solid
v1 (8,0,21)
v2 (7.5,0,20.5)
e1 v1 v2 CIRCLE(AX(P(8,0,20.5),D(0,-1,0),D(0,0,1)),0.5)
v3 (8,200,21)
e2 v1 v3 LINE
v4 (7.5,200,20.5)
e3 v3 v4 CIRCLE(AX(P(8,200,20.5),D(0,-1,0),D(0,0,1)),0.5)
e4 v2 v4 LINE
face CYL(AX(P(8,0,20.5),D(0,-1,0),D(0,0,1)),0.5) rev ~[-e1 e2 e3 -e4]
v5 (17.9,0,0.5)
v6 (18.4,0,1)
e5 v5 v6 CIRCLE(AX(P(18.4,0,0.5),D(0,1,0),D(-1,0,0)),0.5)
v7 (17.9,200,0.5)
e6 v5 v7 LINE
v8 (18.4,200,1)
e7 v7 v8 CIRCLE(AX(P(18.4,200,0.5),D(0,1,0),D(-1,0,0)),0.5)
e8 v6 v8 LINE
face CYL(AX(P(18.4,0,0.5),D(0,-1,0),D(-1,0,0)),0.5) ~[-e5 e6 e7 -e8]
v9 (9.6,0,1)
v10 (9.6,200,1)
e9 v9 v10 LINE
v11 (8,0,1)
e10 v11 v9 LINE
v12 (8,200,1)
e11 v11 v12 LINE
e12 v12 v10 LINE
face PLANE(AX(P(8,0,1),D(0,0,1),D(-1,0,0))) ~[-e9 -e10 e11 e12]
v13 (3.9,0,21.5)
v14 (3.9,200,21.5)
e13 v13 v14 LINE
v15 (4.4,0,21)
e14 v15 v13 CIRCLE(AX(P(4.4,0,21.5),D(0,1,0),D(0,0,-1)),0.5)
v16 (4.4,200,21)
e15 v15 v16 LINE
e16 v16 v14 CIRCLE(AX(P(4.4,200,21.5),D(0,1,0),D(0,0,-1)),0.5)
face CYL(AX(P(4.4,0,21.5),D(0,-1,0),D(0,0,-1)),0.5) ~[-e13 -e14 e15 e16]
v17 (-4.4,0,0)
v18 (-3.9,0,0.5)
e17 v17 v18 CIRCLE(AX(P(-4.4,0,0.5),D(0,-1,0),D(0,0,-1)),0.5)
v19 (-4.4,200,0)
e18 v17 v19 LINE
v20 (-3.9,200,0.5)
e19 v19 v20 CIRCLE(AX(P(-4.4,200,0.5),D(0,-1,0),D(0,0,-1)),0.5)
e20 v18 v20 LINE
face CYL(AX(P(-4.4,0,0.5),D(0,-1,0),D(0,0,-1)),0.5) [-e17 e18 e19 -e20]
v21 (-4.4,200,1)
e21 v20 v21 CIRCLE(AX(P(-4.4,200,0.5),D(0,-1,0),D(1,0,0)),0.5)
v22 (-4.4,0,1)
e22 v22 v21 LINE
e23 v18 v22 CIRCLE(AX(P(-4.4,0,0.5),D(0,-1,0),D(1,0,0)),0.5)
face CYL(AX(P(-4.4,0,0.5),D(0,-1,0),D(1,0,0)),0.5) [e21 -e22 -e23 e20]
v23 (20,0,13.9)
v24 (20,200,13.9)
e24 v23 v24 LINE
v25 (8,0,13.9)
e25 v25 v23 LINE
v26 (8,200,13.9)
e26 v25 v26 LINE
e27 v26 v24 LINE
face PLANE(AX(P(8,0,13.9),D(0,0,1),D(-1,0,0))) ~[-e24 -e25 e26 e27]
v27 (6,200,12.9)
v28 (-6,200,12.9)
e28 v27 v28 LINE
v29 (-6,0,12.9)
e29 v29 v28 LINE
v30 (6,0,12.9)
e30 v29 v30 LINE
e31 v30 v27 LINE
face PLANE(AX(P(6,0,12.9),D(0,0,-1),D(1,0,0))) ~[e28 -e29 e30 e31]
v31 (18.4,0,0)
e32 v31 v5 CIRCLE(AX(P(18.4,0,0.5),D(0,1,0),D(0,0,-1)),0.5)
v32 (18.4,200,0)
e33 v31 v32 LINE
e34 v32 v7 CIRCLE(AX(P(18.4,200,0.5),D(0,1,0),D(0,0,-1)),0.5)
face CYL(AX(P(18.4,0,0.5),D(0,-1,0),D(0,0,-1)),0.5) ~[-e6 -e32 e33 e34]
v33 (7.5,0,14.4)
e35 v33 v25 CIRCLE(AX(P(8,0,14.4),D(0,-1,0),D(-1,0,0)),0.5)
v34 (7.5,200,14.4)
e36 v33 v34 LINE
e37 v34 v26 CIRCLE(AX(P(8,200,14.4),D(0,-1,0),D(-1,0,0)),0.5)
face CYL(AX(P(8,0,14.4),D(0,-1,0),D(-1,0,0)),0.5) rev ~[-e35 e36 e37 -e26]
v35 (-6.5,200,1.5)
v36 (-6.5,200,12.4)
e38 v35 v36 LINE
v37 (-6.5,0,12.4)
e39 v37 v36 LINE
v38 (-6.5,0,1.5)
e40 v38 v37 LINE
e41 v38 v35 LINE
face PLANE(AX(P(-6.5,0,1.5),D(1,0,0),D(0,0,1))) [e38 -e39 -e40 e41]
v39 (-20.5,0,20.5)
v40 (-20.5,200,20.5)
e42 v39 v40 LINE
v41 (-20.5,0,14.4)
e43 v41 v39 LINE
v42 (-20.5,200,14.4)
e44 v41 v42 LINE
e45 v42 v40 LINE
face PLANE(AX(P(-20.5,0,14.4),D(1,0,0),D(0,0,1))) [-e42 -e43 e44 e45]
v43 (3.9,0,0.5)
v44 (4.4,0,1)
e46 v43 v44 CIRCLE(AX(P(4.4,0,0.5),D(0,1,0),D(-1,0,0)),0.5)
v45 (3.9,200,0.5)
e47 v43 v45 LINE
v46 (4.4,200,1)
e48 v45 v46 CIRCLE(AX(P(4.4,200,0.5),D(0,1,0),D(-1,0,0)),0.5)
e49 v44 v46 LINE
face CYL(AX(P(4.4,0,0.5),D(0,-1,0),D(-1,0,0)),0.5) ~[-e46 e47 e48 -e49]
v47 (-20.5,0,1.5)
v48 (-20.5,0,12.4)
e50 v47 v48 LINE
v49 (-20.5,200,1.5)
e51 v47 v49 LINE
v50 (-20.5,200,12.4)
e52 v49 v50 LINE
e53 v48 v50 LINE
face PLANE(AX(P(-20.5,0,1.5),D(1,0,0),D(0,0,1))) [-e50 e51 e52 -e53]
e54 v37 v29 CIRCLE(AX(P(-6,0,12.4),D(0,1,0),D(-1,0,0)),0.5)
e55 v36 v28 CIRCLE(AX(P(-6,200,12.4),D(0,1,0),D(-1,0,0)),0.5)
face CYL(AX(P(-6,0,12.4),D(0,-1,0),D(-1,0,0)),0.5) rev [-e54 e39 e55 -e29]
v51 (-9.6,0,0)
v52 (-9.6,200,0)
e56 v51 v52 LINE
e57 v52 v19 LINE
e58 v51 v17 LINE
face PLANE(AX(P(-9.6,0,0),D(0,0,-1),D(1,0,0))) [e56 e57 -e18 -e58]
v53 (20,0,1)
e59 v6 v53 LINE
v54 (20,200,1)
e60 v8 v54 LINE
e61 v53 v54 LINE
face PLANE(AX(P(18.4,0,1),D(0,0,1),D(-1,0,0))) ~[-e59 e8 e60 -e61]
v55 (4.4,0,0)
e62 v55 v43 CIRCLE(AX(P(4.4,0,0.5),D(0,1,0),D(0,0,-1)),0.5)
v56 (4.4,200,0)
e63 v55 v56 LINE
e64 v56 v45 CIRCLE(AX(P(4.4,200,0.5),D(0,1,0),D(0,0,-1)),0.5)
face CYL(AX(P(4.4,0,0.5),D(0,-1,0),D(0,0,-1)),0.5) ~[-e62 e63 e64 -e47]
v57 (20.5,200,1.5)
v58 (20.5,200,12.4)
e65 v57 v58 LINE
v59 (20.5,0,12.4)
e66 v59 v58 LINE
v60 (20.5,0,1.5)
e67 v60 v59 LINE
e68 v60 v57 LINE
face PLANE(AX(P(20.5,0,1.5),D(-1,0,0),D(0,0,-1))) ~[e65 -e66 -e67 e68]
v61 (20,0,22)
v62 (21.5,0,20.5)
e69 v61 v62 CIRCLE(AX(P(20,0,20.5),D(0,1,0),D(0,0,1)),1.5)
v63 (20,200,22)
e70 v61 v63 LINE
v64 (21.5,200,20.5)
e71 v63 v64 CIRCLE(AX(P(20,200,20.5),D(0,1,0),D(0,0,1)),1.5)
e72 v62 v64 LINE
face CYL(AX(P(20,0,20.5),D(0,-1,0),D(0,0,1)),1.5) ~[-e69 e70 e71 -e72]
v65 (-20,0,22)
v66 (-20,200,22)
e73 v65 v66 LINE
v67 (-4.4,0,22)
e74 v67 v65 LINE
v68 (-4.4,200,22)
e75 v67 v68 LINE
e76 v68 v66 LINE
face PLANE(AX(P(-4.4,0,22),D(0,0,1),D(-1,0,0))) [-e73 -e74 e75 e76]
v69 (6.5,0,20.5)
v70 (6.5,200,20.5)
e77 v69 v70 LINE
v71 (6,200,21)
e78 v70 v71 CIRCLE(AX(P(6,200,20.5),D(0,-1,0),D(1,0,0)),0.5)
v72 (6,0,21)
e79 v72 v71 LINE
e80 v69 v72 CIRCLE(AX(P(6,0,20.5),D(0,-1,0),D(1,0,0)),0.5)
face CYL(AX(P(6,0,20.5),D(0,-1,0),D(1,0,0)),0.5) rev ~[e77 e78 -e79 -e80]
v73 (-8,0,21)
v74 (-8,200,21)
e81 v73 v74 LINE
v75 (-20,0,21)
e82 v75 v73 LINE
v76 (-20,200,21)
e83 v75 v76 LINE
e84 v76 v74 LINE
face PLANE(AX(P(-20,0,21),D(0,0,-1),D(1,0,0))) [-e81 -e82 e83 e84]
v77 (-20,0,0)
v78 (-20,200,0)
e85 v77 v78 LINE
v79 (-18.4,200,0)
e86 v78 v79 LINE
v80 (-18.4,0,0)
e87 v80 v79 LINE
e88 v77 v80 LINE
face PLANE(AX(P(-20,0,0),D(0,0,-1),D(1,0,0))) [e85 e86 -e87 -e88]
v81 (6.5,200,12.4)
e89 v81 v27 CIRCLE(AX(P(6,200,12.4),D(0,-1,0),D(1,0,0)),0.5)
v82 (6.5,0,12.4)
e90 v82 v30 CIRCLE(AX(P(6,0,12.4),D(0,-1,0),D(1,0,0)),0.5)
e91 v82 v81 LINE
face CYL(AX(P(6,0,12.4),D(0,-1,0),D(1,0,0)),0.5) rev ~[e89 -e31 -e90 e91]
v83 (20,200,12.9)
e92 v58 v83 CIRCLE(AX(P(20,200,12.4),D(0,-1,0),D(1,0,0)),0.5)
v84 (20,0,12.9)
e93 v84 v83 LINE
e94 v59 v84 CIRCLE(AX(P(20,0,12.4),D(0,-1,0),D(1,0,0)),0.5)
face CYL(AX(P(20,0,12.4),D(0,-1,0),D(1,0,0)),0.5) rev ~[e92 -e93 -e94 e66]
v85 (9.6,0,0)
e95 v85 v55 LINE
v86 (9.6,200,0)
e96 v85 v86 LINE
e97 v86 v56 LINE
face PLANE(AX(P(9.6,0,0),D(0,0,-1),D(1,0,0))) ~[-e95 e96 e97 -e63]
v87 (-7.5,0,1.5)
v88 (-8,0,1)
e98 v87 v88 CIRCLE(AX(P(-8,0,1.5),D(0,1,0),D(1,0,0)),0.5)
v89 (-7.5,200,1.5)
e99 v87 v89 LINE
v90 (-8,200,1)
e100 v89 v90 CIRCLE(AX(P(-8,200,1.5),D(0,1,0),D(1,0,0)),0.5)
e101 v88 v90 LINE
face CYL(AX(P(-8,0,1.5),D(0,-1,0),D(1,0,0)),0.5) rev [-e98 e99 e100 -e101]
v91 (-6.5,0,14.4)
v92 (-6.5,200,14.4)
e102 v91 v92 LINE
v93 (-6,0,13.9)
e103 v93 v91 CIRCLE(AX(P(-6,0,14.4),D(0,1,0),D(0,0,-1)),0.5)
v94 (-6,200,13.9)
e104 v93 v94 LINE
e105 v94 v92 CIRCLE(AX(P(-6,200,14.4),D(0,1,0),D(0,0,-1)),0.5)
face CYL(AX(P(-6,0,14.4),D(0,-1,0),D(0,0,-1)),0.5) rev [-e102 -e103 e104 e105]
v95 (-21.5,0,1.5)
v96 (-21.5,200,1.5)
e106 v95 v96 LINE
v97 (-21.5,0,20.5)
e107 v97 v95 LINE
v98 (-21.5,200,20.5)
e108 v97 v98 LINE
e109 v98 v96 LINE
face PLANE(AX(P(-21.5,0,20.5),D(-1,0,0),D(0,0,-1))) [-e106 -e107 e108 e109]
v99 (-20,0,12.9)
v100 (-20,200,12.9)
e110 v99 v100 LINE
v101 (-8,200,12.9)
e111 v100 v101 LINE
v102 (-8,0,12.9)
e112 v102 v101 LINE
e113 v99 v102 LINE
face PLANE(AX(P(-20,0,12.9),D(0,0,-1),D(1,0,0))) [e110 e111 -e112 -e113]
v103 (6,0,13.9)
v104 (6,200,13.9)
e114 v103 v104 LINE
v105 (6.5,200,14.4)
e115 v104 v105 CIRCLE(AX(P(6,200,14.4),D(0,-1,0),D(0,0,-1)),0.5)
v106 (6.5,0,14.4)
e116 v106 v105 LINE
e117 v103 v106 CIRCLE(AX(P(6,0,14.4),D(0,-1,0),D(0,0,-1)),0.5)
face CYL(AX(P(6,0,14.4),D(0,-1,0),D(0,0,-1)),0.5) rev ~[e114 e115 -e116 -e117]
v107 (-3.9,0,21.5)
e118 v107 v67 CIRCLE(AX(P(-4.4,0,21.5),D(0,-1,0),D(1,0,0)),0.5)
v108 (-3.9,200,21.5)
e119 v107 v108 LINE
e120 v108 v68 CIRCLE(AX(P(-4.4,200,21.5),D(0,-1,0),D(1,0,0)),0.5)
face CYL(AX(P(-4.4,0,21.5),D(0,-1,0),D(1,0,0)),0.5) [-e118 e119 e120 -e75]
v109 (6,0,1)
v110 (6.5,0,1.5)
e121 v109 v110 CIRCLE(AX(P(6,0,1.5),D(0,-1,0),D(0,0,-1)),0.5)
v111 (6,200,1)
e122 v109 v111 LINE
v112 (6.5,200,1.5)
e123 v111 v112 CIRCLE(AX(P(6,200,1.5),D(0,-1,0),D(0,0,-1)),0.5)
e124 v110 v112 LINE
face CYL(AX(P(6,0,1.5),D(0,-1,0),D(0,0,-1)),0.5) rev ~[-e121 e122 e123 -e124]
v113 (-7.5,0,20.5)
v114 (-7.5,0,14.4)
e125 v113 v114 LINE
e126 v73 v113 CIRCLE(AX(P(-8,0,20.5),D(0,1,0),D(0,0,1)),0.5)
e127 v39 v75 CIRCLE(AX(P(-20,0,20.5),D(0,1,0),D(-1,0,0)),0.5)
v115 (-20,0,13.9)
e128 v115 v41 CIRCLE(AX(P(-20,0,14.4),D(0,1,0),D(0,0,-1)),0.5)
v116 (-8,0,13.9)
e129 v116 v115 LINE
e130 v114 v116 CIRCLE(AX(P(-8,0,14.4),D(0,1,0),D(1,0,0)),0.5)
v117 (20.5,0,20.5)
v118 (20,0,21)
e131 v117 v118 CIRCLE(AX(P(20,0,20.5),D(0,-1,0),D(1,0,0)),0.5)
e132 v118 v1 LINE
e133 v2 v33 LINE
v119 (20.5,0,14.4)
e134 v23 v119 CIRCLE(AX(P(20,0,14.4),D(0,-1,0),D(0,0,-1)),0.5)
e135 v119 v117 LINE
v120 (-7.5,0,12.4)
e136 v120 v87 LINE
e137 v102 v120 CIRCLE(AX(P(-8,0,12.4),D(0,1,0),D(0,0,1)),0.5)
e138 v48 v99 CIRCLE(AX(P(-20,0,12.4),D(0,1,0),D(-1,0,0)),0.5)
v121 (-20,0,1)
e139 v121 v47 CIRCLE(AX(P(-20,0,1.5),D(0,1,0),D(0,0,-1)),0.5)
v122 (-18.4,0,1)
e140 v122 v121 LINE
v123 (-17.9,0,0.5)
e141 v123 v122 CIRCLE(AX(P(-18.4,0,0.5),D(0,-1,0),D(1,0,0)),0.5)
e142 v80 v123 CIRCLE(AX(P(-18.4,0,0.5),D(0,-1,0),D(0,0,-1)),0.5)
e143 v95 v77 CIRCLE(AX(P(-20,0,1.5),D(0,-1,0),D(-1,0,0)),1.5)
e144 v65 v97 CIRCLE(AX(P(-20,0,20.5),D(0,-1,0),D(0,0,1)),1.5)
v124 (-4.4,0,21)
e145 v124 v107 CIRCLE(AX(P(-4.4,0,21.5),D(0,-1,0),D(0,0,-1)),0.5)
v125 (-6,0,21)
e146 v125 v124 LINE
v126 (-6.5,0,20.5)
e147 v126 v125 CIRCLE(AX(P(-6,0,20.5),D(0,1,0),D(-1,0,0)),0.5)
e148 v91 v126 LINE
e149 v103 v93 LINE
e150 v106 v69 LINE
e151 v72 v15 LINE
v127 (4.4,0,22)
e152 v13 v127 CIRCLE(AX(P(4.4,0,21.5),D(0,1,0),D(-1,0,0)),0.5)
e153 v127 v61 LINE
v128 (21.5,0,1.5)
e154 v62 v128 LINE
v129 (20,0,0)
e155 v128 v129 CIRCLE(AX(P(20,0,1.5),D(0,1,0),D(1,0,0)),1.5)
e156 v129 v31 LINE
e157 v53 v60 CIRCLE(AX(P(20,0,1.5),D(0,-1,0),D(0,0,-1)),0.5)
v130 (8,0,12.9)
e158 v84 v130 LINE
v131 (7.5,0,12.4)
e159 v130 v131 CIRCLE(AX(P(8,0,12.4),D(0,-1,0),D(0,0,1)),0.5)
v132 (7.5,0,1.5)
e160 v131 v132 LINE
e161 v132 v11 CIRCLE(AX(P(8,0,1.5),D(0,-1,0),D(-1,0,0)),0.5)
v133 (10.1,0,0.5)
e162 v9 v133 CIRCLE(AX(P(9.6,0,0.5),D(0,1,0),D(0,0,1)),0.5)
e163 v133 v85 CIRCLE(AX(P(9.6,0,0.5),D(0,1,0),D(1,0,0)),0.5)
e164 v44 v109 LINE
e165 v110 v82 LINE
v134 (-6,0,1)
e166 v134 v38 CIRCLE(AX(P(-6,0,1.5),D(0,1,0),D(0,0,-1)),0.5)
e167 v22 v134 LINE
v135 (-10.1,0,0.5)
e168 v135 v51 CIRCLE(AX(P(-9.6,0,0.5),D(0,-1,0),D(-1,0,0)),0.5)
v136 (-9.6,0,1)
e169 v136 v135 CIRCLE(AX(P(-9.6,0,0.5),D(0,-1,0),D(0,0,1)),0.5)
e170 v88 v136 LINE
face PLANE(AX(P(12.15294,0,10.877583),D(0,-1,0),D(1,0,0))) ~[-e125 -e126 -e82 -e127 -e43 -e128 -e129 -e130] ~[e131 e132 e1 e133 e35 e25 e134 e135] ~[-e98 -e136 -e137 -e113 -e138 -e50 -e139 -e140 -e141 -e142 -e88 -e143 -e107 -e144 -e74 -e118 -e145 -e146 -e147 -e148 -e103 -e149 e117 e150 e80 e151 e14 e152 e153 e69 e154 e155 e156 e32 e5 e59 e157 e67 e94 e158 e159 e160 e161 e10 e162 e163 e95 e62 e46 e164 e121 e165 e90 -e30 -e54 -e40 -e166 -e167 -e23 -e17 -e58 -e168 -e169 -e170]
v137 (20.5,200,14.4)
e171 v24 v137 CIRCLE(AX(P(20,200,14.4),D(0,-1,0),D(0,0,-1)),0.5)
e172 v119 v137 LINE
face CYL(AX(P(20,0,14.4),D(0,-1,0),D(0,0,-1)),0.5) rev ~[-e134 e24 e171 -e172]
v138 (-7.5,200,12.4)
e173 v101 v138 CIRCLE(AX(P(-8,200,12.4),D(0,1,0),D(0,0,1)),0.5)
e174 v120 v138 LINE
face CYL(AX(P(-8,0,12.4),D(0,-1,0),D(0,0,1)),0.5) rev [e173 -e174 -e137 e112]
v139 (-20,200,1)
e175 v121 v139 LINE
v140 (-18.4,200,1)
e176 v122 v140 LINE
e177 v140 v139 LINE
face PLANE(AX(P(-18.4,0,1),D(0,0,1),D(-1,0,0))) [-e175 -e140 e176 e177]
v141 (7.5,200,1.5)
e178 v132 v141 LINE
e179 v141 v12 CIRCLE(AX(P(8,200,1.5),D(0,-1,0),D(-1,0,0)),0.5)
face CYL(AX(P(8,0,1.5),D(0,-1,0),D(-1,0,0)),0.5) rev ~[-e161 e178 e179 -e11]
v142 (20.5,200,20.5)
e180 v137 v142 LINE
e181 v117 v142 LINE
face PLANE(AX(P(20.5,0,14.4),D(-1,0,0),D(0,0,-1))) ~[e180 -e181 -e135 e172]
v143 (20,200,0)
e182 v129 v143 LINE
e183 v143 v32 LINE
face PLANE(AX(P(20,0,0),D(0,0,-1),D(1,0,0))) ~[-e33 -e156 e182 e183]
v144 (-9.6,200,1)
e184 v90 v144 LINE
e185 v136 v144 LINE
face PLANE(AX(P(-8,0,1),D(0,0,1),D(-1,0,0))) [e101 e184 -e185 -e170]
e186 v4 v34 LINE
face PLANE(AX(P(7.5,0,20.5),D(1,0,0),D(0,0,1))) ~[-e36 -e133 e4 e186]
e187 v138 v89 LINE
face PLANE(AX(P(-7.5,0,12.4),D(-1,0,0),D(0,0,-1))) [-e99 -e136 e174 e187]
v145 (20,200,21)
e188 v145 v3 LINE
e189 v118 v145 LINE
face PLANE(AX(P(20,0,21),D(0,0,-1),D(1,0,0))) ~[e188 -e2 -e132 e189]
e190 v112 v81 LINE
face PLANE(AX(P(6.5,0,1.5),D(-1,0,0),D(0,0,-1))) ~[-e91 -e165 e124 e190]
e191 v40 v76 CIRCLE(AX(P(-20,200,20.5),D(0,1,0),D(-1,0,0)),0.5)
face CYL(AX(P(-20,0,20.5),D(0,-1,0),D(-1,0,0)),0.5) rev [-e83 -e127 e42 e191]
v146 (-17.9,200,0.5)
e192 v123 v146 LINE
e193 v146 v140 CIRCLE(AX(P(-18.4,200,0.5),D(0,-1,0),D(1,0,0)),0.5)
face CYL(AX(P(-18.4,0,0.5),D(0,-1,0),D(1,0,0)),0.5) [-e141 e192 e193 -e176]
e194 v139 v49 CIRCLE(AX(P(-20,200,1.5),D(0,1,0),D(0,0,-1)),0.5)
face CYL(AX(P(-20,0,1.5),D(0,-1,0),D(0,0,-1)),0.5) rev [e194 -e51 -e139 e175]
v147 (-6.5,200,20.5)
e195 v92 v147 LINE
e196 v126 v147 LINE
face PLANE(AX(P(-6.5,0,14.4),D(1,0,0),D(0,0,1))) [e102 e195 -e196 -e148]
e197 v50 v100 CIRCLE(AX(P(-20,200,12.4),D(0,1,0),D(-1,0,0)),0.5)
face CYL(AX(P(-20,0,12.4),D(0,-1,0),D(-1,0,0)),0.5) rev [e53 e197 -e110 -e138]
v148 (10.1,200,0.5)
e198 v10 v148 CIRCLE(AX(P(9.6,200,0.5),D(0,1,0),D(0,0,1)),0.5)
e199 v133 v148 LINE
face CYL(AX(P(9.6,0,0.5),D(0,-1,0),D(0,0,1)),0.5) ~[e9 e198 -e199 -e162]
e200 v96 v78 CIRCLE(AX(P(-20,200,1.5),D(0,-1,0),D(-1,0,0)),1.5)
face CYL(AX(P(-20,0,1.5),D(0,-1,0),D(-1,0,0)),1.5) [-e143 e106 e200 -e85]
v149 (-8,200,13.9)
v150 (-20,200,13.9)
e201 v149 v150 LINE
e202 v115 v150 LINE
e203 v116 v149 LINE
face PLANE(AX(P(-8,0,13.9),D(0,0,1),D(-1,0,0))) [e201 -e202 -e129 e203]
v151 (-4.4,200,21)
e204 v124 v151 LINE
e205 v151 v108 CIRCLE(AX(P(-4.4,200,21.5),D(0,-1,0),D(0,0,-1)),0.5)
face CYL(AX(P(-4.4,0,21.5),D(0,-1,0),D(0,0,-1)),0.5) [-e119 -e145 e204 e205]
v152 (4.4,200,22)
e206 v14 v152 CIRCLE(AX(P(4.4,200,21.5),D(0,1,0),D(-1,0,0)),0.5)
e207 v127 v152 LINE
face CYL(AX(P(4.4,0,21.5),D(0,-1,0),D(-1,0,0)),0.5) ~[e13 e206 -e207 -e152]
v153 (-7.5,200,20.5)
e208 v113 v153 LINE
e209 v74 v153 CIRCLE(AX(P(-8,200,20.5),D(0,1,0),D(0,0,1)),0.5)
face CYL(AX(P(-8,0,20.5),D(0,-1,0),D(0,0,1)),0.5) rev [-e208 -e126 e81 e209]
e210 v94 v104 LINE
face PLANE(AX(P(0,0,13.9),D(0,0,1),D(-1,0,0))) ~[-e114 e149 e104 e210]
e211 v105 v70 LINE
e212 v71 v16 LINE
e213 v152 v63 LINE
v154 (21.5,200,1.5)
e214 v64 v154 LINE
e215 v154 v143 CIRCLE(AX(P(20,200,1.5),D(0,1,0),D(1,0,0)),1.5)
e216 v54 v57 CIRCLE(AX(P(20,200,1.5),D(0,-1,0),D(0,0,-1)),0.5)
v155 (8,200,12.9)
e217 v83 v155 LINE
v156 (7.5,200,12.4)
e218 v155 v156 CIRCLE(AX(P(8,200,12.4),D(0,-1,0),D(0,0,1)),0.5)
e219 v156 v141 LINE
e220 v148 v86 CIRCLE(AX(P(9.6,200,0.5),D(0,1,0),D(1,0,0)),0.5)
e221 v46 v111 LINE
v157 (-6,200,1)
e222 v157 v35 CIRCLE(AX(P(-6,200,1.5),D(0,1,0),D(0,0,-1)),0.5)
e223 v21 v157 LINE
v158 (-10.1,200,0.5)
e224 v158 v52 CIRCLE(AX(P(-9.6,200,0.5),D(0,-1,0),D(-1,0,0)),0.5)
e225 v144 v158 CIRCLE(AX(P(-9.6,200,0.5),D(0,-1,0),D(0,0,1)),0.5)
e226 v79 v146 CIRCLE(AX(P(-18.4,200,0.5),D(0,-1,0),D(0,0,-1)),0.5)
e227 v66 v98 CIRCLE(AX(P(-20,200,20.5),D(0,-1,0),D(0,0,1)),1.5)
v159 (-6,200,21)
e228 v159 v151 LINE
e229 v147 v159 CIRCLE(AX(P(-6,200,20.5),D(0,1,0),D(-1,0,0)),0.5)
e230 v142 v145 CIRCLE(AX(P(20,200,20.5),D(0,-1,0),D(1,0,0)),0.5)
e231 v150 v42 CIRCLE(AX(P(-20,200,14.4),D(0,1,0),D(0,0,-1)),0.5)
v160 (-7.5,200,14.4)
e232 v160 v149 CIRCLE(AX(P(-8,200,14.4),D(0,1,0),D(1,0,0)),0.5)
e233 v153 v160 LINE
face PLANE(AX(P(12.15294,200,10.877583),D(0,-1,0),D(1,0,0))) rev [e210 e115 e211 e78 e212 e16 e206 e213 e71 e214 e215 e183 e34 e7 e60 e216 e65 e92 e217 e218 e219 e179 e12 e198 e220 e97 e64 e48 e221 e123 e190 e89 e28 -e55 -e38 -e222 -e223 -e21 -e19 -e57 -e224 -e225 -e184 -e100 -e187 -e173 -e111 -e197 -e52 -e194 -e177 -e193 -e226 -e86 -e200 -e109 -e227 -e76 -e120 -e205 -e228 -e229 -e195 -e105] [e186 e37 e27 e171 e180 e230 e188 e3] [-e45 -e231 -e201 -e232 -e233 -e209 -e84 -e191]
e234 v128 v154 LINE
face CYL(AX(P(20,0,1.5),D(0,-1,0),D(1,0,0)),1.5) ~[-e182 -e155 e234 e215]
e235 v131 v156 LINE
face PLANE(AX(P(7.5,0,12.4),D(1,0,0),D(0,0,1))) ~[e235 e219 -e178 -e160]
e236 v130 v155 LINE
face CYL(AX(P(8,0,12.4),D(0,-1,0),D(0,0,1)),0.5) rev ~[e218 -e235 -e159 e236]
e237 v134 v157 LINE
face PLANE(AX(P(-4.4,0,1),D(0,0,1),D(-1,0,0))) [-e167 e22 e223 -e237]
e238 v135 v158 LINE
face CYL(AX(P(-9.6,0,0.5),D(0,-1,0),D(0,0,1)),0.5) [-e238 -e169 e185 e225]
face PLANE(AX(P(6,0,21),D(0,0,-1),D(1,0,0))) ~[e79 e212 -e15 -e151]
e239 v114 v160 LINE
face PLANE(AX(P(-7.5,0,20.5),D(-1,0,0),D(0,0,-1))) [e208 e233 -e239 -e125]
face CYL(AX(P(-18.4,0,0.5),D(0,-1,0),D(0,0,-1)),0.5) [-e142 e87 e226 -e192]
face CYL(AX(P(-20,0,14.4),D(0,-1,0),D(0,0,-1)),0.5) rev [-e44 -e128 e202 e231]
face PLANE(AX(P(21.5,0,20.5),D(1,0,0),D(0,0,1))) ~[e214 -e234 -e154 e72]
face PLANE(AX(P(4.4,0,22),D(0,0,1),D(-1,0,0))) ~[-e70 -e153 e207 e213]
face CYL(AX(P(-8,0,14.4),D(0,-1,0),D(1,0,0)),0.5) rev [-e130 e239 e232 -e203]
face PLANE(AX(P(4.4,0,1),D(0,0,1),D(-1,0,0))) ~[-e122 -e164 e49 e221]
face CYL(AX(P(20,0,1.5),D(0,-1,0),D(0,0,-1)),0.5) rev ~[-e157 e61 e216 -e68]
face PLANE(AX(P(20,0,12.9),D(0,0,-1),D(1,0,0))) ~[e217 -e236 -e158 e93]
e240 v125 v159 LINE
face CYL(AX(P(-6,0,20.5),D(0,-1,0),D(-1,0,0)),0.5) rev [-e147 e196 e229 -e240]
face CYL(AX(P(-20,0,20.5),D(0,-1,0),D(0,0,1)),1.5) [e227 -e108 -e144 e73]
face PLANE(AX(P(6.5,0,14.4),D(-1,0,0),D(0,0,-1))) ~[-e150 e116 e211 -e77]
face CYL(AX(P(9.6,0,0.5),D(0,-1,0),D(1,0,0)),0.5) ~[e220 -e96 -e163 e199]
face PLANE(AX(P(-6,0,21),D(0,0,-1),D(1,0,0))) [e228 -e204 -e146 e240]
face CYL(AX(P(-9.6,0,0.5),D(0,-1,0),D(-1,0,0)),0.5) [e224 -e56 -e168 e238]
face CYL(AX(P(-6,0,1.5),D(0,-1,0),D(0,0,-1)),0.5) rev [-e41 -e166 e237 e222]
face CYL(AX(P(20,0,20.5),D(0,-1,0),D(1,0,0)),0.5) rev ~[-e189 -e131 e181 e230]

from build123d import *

# Parameters (mm, degrees)
F1_DEPTH = 200


# Not quite as in the source:
# - a pattern or mirror of a feature is missing from the dataset's text; its kind, count and spacing are read off the source's solid


with BuildPart() as f1:
    # F0 (on Front) → F1 (new body)
    with BuildSketch(Plane.XZ):
        with BuildLine():
            ThreePointArc((-3.9, 21.5), (-4.0464466094, 21.8535533906), (-4.4, 22))
            Line((-4.4, 22), (-20, 22))
            ThreePointArc((-20, 22), (-21.0606601718, 21.5606601718), (-21.5, 20.5))
            Line((-21.5, 20.5), (-21.5, 1.5))
            ThreePointArc((-21.5, 1.5), (-21.0606601718, 0.4393398282), (-20, 0))
            Line((-20, 0), (-18.4, 0))
            ThreePointArc((-18.4, 0), (-18.0464466094, 0.1464466094), (-17.9, 0.5))
            ThreePointArc((-17.9, 0.5), (-18.0464466094, 0.8535533906), (-18.4, 1))
            Line((-18.4, 1), (-20, 1))
            ThreePointArc((-20, 1), (-20.3535533906, 1.1464466094), (-20.5, 1.5))
            Line((-20.5, 1.5), (-20.5, 12.4))
            ThreePointArc((-20.5, 12.4), (-20.3535533906, 12.7535533906), (-20, 12.9))
            Line((-20, 12.9), (-8, 12.9))
            ThreePointArc((-8, 12.9), (-7.6464466094, 12.7535533906), (-7.5, 12.4))
            Line((-7.5, 12.4), (-7.5, 1.5))
            ThreePointArc((-7.5, 1.5), (-7.6464466094, 1.1464466094), (-8, 1))
            Line((-8, 1), (-9.6, 1))
            ThreePointArc((-9.6, 1), (-9.9535533906, 0.8535533906), (-10.1, 0.5))
            ThreePointArc((-10.1, 0.5), (-9.9535533906, 0.1464466094), (-9.6, 0))
            Line((-9.6, 0), (-4.4, 0))
            ThreePointArc((-4.4, 0), (-4.0464466094, 0.1464466094), (-3.9, 0.5))
            ThreePointArc((-3.9, 0.5), (-4.0464466094, 0.8535533906), (-4.4, 1))
            Line((-4.4, 1), (-6, 1))
            ThreePointArc((-6, 1), (-6.3535533906, 1.1464466094), (-6.5, 1.5))
            Line((-6.5, 1.5), (-6.5, 12.4))
            ThreePointArc((-6.5, 12.4), (-6.3535533906, 12.7535533906), (-6, 12.9))
            Line((-6, 12.9), (0, 12.9))
            Line((0, 12.9), (0, 13.9))
            Line((0, 13.9), (-6, 13.9))
            ThreePointArc((-6, 13.9), (-6.3535533906, 14.0464466094), (-6.5, 14.4))
            Line((-6.5, 14.4), (-6.5, 20.5))
            ThreePointArc((-6.5, 20.5), (-6.3535533906, 20.8535533906), (-6, 21))
            Line((-6, 21), (-4.4, 21))
            ThreePointArc((-4.4, 21), (-4.0464466094, 21.1464466094), (-3.9, 21.5))
        make_face()
        with BuildLine():
            Line((-8, 13.9), (-20, 13.9))
            ThreePointArc((-20, 13.9), (-20.3535533906, 14.0464466094), (-20.5, 14.4))
            Line((-20.5, 14.4), (-20.5, 20.5))
            ThreePointArc((-20.5, 20.5), (-20.3535533906, 20.8535533906), (-20, 21))
            Line((-20, 21), (-8, 21))
            ThreePointArc((-8, 21), (-7.6464466094, 20.8535533906), (-7.5, 20.5))
            Line((-7.5, 20.5), (-7.5, 14.4))
            ThreePointArc((-7.5, 14.4), (-7.6464466094, 14.0464466094), (-8, 13.9))
        make_face(mode=Mode.SUBTRACT)
    extrude(amount=-F1_DEPTH)

    # F1_copies: F1 across plane


with BuildPart() as f1_1:
    add(f1.part)
    add(f1.part.mirror(Plane(origin=(0, 0, 0), x_dir=(0, 0, 1), z_dir=(1, 0, 0))))


solid = f1_1.part
